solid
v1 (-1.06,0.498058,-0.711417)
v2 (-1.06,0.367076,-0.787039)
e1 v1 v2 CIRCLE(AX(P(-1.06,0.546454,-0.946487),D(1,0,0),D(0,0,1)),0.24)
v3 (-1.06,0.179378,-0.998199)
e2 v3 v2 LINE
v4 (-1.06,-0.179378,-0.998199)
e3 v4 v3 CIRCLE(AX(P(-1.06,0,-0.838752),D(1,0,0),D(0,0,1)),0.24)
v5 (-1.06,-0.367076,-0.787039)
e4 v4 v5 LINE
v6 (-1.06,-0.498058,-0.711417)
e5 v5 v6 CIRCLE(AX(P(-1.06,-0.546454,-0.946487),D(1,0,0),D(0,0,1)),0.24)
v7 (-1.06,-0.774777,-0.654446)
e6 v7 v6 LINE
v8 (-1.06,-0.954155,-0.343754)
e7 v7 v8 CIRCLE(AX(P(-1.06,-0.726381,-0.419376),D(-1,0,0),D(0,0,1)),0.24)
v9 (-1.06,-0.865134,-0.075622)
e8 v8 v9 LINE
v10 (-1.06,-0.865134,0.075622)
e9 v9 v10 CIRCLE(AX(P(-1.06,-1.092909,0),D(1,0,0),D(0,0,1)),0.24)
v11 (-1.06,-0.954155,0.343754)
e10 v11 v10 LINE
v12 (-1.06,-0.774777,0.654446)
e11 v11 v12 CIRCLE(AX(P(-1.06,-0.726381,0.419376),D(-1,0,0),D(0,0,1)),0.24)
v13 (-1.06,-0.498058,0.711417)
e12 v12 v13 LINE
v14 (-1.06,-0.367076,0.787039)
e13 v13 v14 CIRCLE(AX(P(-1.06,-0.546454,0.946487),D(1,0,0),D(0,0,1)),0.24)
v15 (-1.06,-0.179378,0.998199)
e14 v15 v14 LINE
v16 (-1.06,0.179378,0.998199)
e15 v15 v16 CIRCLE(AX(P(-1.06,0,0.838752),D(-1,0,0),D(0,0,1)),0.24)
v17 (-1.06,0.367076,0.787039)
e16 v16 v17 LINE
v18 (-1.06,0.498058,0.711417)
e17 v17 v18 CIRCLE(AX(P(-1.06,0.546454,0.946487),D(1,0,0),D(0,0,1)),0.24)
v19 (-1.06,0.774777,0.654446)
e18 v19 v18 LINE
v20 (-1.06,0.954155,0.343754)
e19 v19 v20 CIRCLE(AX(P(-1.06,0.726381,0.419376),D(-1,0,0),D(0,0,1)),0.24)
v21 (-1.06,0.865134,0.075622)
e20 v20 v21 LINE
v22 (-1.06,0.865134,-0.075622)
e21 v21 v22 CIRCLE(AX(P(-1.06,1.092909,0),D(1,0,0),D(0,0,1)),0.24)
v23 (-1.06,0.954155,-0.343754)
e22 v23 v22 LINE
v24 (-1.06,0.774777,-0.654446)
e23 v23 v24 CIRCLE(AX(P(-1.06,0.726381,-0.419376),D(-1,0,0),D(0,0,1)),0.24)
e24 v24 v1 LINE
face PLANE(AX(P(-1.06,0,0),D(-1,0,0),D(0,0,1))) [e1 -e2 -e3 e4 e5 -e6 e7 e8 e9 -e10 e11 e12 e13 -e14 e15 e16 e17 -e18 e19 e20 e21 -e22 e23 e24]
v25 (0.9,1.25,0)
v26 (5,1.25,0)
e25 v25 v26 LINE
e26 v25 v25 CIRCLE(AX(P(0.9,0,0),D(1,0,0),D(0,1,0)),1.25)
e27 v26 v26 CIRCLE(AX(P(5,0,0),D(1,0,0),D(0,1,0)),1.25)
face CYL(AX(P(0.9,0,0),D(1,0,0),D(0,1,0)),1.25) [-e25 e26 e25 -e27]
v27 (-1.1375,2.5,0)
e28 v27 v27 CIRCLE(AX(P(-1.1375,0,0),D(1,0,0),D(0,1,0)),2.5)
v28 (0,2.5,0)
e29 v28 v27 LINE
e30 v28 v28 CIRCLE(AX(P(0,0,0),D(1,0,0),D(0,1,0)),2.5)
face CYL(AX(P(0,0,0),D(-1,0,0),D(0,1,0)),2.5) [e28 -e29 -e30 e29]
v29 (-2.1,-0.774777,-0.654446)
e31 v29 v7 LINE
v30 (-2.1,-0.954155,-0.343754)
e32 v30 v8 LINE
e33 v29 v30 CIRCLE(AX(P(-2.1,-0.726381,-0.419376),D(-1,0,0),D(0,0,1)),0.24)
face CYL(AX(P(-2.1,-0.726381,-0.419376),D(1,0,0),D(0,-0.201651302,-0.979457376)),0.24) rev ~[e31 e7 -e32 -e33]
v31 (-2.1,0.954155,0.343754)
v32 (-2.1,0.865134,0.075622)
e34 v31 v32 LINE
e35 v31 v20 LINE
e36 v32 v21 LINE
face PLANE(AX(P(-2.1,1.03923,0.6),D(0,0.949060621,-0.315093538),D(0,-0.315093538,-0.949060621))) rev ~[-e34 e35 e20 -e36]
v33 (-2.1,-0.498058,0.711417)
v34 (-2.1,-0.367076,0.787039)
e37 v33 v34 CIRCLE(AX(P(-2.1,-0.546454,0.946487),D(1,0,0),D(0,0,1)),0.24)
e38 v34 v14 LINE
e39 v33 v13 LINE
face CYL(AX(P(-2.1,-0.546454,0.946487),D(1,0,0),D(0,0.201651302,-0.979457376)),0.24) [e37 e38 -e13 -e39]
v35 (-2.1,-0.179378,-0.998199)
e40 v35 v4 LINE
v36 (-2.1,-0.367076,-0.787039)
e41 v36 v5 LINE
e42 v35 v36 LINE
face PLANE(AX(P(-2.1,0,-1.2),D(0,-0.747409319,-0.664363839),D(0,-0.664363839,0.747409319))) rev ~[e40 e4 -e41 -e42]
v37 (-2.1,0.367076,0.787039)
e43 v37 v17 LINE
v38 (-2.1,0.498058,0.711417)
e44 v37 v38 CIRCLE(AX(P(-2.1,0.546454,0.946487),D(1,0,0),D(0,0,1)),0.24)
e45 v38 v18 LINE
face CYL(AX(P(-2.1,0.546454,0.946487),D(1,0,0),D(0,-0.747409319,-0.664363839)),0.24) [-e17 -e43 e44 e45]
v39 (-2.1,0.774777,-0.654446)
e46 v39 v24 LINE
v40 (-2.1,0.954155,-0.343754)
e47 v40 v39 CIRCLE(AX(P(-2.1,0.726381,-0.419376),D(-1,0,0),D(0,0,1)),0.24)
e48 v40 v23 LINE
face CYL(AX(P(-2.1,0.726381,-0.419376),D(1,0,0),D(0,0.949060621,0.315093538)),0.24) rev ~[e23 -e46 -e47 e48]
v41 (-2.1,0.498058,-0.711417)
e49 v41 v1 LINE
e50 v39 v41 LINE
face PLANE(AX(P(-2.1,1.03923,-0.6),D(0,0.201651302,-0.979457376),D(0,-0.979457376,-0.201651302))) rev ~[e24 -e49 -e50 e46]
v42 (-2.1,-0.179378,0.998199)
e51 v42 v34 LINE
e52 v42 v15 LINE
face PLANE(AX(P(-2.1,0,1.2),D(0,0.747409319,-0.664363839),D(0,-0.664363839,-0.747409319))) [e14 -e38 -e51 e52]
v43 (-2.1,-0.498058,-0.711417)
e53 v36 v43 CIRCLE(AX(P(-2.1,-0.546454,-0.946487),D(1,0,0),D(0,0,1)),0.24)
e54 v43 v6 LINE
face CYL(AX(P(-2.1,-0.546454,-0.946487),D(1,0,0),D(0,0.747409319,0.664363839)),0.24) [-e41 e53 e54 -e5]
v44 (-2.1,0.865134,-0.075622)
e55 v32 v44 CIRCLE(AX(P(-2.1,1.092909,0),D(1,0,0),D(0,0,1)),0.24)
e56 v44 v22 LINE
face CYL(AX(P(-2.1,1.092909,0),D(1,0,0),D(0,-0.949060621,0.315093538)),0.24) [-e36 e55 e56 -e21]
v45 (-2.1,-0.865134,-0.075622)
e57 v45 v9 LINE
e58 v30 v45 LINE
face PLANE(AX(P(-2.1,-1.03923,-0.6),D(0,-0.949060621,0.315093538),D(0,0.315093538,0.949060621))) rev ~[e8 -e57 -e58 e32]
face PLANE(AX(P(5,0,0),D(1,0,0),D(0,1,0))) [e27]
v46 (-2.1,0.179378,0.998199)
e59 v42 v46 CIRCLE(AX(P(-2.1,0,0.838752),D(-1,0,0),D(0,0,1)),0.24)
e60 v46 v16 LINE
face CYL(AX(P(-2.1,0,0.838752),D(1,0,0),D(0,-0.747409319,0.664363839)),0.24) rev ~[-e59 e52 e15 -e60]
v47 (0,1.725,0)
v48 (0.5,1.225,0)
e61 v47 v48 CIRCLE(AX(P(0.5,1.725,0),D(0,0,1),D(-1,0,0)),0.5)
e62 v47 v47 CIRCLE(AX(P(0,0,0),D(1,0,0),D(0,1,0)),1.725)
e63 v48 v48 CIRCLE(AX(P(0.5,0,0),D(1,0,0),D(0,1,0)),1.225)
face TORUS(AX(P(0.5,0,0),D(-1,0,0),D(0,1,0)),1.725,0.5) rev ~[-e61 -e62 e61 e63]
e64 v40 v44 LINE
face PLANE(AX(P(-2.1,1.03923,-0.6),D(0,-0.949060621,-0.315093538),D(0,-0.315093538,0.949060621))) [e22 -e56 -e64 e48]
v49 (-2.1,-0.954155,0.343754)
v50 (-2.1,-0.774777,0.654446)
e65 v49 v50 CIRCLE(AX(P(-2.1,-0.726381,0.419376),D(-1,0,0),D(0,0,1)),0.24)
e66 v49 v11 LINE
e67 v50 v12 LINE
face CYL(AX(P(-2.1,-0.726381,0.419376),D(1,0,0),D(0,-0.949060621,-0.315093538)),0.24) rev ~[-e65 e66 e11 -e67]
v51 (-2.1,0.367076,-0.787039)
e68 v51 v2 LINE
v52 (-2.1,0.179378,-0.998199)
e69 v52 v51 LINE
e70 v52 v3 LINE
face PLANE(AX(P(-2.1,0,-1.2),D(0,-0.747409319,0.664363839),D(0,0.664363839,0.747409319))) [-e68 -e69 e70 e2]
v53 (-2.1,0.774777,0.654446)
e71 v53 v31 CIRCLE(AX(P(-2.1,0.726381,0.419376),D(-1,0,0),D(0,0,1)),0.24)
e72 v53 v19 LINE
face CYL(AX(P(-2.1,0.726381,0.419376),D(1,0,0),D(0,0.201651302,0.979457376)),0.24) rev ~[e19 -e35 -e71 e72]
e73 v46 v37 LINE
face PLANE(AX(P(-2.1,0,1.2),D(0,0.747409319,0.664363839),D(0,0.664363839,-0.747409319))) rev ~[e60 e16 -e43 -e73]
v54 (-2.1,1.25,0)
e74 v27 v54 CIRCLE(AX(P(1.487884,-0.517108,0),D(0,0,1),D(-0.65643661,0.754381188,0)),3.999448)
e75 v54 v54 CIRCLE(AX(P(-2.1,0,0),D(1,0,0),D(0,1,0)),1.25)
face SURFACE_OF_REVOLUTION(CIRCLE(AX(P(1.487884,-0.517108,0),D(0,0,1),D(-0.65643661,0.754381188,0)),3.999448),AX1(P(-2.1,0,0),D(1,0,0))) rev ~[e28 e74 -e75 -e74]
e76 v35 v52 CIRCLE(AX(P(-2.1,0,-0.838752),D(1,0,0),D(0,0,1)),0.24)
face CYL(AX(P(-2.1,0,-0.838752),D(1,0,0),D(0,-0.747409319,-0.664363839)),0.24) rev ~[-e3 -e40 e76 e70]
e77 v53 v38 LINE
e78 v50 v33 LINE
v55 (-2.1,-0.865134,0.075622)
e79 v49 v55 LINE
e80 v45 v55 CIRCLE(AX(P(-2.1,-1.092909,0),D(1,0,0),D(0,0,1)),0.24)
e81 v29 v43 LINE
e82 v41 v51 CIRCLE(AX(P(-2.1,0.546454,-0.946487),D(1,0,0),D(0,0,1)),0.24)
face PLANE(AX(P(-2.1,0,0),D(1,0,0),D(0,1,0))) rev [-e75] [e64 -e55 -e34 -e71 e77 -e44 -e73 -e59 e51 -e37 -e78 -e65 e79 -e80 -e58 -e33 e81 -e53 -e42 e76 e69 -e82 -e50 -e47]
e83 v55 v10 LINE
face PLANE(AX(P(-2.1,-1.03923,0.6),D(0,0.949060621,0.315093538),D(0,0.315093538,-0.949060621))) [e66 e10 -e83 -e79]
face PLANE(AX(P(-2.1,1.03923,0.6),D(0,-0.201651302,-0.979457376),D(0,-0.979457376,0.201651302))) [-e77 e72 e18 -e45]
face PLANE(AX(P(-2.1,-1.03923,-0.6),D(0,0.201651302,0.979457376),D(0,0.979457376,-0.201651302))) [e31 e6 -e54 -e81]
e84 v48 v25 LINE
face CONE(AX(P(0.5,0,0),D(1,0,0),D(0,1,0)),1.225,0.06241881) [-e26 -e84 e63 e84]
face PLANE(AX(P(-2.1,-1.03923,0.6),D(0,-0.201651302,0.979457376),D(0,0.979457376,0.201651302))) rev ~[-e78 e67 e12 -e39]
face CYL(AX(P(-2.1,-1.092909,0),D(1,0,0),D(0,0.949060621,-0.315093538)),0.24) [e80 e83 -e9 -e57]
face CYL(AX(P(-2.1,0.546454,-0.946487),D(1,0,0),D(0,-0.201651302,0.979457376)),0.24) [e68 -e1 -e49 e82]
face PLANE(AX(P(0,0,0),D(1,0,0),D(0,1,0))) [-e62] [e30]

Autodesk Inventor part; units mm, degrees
ref_plane "YZ Plane" through (0, 0, 0) normal (1, 0, 0) x (0, 1, 0)
ref_plane "XZ Plane" through (0, 0, 0) normal (0, 1, 0) x (-1, 0, 0)
ref_plane "XY Plane" through (0, 0, 0) normal (0, 0, 1) x (1, 0, 0)
sketch "Sketch4" plane through (0, 0, 0) normal (0, 0, 1) x (1, 0, 0)
  line L0 (-2.1, 0) -> (5, 0)
  line L1 (0, 0) -> (-2.1, 0)
  line L2 (0, 2.5) -> (0, 1.725)
  line L3 (0.5, 1.225) -> (0.5, 1.225)
  line L4 (0.5, 1.225) -> (0.9, 1.25)
  arc A0 (0, 1.725) -> (0.5, 1.225) centre (0.5, 1.725) ccw
  line L5 (-2.1, 0) -> (-2.1, 1.25)
  line L6 (0, 2.5) -> (-1.1375, 2.5)
  arc A1 (-1.1375, 2.5) -> (-2.1, 1.25) centre (1.4883, -0.5175) ccw
  line L7 (0.9, 1.25) -> (5, 1.25)
  line L8 (5, 1.25) -> (5, 0)
  point P0 (0, 1.225)
  dimension "d71" = 0.5
  dimension "d72" = 5
  dimension "d74" = 0.4
  dimension "d75" = 2.45
  dimension "d78" = 2.5
  dimension "d82" = 4
  dimension "d83" = 2.1
  dimension "d84" = 5
  dimension "d104" = 4.1
  dimension "d105" = 2.5
revolve "Revolution7" add sketch "Sketch4" angle 360 about axis through (-2.1, 0, 0) along (1, 0, 0)
sketch "Sketch5" plane through (-2.1, 0, 0) normal (-1, 0, 0) x (0, 0, 1)
  circle A0 centre (0, 0) radius 1.2 construction
  circle A1 centre (0, 0) radius 0.84 construction
  line L0 (0, 0) -> (-0.7275, 0.42)
  line L1 (0, 0) -> (-0.7275, -0.42)
  line L2 (-1.8008, 0) -> (1.7887, 0)
  line L3 (-1.2, 0) -> (-0.7275, -0.42)
  line L4 (-1.2, 0) -> (-0.7275, 0.42)
  dimension "d88" = 2.4
  dimension "d89" = 1.68
  dimension "d90" = 30
  dimension "d91" = 30
extrude "Extrusion1" cut sketch "Sketch5" against normal blind 1.04
pattern_circular "Circular Pattern1" count 6 over 360 about axis through (-10, 0, 0) along (1, 0, 0) of "Extrusion1"
fillet "Fillet1" radius 0.24 12 edges at (-1.58, -1.0392, -0.6) (-1.58, -0.42, -0.7275) (-1.58, -0.84, 0) (-1.58, -1.0392, 0.6) (-1.58, -0.42, 0.7275) (-1.58, 0, 1.2) (-1.58, 0.84, 0) (-1.58, 1.0392, 0.6) (-1.58, 0.42, 0.7275) (-1.58, 0.42, -0.7275) (-1.58, 0, -1.2) (-1.58, 1.0392, -0.6)
thread "Thread7" size "M2.5x0.45" class "6g" standard "ISO Metric profile" length 4.1
properties part number "Flachkopfschraube mit Innenrund ISO 14583 - M2,5 x 5 - 4.8" material "Stahl"
